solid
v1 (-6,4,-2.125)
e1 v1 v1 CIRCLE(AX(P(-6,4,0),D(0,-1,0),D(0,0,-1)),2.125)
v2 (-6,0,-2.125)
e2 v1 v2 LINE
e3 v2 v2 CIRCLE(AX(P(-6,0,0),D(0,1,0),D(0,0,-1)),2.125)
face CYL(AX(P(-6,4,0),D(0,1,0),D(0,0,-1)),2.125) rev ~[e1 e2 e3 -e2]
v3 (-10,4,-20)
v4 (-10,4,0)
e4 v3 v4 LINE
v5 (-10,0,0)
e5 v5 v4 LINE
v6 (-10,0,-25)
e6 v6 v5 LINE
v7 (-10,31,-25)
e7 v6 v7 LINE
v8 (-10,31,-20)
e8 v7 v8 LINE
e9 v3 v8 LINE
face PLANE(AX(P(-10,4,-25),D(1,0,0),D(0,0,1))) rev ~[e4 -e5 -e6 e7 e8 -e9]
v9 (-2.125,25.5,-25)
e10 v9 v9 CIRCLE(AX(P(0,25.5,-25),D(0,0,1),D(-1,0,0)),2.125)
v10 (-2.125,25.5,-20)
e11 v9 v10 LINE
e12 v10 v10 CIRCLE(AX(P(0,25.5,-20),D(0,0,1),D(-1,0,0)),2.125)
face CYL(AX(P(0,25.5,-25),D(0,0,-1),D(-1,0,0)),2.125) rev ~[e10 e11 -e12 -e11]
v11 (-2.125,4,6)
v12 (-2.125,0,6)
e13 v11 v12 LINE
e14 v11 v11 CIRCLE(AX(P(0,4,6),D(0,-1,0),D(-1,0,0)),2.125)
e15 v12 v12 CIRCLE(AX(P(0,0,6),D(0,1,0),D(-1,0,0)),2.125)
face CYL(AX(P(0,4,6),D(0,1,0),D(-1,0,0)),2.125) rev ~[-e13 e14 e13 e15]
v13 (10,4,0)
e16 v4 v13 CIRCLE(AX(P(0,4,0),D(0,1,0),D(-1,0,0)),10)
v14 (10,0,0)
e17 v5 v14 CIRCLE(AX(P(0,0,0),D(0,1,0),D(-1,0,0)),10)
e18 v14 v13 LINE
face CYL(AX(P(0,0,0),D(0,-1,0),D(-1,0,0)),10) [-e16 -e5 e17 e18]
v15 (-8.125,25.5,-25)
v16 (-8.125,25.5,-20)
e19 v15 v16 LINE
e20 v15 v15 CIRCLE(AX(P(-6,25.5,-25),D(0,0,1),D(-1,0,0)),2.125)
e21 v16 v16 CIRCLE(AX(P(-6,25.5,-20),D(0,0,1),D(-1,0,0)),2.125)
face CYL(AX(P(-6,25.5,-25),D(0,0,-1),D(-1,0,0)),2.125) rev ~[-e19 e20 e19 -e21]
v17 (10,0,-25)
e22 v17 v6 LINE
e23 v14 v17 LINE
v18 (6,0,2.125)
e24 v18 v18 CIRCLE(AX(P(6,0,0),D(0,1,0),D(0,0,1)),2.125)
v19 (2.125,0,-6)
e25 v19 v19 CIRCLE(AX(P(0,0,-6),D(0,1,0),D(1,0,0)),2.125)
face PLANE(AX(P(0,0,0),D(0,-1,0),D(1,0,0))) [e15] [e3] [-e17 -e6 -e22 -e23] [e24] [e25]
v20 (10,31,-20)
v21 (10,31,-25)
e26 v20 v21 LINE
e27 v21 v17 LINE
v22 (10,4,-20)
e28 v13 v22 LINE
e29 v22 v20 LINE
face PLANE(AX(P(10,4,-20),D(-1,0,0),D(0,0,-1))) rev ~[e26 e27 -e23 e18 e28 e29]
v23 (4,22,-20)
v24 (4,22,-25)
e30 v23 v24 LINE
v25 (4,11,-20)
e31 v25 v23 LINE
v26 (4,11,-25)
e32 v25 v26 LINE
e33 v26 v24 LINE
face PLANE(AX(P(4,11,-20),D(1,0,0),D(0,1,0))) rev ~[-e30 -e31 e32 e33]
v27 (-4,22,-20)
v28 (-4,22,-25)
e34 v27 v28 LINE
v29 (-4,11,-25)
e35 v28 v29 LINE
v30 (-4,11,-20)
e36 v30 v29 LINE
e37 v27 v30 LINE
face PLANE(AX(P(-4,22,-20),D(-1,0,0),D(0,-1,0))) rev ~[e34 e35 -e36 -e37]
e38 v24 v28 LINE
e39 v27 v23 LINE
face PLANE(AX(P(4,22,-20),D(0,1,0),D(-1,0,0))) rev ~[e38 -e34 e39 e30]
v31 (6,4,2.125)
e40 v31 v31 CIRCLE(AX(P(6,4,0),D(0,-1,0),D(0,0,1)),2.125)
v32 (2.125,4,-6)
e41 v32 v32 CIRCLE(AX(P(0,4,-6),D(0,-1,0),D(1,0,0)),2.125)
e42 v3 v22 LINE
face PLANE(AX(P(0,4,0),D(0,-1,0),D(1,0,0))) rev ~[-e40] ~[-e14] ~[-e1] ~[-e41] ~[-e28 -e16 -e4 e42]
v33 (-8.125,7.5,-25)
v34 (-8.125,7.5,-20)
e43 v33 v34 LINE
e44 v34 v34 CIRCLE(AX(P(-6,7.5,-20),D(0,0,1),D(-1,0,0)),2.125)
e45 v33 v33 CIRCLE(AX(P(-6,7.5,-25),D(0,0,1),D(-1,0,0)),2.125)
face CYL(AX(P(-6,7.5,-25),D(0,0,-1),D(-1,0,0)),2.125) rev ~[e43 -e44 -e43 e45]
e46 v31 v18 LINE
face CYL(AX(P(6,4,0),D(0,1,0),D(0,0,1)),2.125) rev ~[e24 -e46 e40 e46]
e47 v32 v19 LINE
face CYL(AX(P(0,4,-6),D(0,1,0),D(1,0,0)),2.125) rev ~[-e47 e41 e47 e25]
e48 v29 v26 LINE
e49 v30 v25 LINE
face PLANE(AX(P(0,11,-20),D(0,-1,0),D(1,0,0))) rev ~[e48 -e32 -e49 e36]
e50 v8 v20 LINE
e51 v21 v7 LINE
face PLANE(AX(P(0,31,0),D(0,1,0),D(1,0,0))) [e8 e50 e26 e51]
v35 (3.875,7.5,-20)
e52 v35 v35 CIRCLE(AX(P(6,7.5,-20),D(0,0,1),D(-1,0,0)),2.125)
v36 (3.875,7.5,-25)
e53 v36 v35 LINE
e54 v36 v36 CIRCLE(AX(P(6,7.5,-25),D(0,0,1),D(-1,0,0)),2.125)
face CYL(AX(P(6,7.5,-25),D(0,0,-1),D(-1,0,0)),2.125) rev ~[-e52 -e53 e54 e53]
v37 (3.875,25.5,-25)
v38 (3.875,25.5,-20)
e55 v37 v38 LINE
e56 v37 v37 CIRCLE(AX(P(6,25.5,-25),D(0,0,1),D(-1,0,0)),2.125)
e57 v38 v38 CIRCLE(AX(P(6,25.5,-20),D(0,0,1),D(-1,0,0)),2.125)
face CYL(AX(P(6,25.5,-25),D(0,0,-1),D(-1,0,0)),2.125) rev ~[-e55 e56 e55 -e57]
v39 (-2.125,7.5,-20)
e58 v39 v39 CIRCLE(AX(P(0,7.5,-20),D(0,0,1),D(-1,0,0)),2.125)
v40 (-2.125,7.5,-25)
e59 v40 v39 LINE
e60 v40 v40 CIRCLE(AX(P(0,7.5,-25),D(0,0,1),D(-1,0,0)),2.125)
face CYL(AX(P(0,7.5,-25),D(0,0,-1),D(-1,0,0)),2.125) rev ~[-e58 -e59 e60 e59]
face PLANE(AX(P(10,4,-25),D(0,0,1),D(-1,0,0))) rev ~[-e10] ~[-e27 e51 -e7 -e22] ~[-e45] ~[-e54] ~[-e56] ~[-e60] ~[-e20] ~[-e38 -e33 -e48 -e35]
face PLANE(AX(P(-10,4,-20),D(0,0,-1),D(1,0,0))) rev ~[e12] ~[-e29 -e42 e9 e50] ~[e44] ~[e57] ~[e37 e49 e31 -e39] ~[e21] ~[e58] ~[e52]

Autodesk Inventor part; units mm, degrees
ref_plane "YZ Plane" through (0, 0, 0) normal (1, 0, 0) x (0, 1, 0)
ref_plane "XZ Plane" through (0, 0, 0) normal (0, 1, 0) x (-1, 0, 0)
ref_plane "XY Plane" through (0, 0, 0) normal (0, 0, 1) x (1, 0, 0)
sketch "Sketch1" plane through (0, 0, 0) normal (0, 1, 0) x (-1, 0, 0)
  circle A0 centre (0, 0) radius 10
  dimension "d0" = 20
extrude "Extrusion1" add sketch "Sketch1" along normal blind 4
sketch "Sketch2" plane through (0, 4, 0) normal (0, 1, 0) x (1, 0, 0)
  line L0 (0, 0) -> (0, 6)
  circle A0 centre (0, 6) radius 2.125
  dimension "d3" = 6
  dimension "d4" = 4.25
extrude "Extrusion2" cut sketch "Sketch2" against normal through all
pattern_circular "Circular Pattern1" count 4 over 360 about axis through (0, 0, 0) along (0, 1, 0) of "Extrusion2"
sketch "Sketch3" plane through (0, 0, 0) normal (0, -1, 0) x (1, 0, 0)
  circle A0 centre (0, 0) radius 10 projected
  arc A1 (-10, 0) -> (10, 0) centre (0, 0) ccw
  line L0 (10, 0) -> (10, -25)
  line L1 (10, -25) -> (-10, -25)
  line L2 (-10, -25) -> (-10, 0)
  dimension "d10" = 25
extrude "Extrusion3" add sketch "Sketch3" against normal blind 4 contours L0 L1 L2 A0
sketch "Sketch4" plane through (0, 4, 0) normal (0, 1, 0) x (1, 0, 0)
  line L0 (-10, 25) -> (-10, 0) projected
  line L1 (10, 25) -> (-10, 25)
  line L2 (-10, 25) -> (-10, 20)
  line L3 (-10, 20) -> (10, 20)
  line L4 (10, 20) -> (10, 25)
  point P0 (0, 0)
  dimension "d13" = 5
extrude "Extrusion4" add sketch "Sketch4" along normal blind 27
sketch "Sketch5" plane through (10, 0, -25) normal (0, 0, -1) x (-1, 0, 0)
  point P0 (10, 0)
sketch "Sketch6" plane through (10, 0, -25) normal (0, 0, -1) x (-1, 0, 0)
  line L0 (7.875, 4) -> (12.125, 4) projected
  line L1 (20, 31) -> (0, 31) projected
  line L2 (10, 17.5) -> (20, 17.5)
  line L3 (10, 17.5) -> (10, 23.5)
  line L4 (10, 23.5) -> (10, 25.5)
  circle A0 centre (10, 25.5) radius 2.125
  point P0 (10, 0)
  dimension "d16" = 6
  dimension "d26" = 2
  dimension "d27" = 4.25
extrude "Extrusion5" cut sketch "Sketch6" against normal through all
pattern_linear "Rectangular Pattern1" count 3 spacing 6 along (-1, 0, 0) count 2 spacing 18 along (0, -1, 0) of "Extrusion5" first direction both ways yes
sketch "Sketch7" plane through (-10, 4, -20) normal (0, 0, 1) x (1, 0, 0)
  circle A0 centre (10, 21.5) radius 2.125 projected
  circle A1 centre (10, 3.5) radius 2.125 projected
  line L0 (10, 21.5) -> (10, 3.5)
  line L1 (6, 7) -> (14, 7)
  line L2 (14, 7) -> (14, 18)
  line L3 (14, 18) -> (6, 18)
  line L4 (6, 18) -> (6, 7)
  line L5 (6, 7) -> (14, 18) construction
  line L6 (14, 7) -> (6, 18) construction
  point P0 (10, -4)
  point P1 (10, 12.5)
  dimension "d29" = 8
  dimension "d30" = 11
extrude "Extrusion6" cut sketch "Sketch7" against normal through all contours L3 L2 L1 L0 | L0 L1 L4 L3
properties part number "ClawJoint"
